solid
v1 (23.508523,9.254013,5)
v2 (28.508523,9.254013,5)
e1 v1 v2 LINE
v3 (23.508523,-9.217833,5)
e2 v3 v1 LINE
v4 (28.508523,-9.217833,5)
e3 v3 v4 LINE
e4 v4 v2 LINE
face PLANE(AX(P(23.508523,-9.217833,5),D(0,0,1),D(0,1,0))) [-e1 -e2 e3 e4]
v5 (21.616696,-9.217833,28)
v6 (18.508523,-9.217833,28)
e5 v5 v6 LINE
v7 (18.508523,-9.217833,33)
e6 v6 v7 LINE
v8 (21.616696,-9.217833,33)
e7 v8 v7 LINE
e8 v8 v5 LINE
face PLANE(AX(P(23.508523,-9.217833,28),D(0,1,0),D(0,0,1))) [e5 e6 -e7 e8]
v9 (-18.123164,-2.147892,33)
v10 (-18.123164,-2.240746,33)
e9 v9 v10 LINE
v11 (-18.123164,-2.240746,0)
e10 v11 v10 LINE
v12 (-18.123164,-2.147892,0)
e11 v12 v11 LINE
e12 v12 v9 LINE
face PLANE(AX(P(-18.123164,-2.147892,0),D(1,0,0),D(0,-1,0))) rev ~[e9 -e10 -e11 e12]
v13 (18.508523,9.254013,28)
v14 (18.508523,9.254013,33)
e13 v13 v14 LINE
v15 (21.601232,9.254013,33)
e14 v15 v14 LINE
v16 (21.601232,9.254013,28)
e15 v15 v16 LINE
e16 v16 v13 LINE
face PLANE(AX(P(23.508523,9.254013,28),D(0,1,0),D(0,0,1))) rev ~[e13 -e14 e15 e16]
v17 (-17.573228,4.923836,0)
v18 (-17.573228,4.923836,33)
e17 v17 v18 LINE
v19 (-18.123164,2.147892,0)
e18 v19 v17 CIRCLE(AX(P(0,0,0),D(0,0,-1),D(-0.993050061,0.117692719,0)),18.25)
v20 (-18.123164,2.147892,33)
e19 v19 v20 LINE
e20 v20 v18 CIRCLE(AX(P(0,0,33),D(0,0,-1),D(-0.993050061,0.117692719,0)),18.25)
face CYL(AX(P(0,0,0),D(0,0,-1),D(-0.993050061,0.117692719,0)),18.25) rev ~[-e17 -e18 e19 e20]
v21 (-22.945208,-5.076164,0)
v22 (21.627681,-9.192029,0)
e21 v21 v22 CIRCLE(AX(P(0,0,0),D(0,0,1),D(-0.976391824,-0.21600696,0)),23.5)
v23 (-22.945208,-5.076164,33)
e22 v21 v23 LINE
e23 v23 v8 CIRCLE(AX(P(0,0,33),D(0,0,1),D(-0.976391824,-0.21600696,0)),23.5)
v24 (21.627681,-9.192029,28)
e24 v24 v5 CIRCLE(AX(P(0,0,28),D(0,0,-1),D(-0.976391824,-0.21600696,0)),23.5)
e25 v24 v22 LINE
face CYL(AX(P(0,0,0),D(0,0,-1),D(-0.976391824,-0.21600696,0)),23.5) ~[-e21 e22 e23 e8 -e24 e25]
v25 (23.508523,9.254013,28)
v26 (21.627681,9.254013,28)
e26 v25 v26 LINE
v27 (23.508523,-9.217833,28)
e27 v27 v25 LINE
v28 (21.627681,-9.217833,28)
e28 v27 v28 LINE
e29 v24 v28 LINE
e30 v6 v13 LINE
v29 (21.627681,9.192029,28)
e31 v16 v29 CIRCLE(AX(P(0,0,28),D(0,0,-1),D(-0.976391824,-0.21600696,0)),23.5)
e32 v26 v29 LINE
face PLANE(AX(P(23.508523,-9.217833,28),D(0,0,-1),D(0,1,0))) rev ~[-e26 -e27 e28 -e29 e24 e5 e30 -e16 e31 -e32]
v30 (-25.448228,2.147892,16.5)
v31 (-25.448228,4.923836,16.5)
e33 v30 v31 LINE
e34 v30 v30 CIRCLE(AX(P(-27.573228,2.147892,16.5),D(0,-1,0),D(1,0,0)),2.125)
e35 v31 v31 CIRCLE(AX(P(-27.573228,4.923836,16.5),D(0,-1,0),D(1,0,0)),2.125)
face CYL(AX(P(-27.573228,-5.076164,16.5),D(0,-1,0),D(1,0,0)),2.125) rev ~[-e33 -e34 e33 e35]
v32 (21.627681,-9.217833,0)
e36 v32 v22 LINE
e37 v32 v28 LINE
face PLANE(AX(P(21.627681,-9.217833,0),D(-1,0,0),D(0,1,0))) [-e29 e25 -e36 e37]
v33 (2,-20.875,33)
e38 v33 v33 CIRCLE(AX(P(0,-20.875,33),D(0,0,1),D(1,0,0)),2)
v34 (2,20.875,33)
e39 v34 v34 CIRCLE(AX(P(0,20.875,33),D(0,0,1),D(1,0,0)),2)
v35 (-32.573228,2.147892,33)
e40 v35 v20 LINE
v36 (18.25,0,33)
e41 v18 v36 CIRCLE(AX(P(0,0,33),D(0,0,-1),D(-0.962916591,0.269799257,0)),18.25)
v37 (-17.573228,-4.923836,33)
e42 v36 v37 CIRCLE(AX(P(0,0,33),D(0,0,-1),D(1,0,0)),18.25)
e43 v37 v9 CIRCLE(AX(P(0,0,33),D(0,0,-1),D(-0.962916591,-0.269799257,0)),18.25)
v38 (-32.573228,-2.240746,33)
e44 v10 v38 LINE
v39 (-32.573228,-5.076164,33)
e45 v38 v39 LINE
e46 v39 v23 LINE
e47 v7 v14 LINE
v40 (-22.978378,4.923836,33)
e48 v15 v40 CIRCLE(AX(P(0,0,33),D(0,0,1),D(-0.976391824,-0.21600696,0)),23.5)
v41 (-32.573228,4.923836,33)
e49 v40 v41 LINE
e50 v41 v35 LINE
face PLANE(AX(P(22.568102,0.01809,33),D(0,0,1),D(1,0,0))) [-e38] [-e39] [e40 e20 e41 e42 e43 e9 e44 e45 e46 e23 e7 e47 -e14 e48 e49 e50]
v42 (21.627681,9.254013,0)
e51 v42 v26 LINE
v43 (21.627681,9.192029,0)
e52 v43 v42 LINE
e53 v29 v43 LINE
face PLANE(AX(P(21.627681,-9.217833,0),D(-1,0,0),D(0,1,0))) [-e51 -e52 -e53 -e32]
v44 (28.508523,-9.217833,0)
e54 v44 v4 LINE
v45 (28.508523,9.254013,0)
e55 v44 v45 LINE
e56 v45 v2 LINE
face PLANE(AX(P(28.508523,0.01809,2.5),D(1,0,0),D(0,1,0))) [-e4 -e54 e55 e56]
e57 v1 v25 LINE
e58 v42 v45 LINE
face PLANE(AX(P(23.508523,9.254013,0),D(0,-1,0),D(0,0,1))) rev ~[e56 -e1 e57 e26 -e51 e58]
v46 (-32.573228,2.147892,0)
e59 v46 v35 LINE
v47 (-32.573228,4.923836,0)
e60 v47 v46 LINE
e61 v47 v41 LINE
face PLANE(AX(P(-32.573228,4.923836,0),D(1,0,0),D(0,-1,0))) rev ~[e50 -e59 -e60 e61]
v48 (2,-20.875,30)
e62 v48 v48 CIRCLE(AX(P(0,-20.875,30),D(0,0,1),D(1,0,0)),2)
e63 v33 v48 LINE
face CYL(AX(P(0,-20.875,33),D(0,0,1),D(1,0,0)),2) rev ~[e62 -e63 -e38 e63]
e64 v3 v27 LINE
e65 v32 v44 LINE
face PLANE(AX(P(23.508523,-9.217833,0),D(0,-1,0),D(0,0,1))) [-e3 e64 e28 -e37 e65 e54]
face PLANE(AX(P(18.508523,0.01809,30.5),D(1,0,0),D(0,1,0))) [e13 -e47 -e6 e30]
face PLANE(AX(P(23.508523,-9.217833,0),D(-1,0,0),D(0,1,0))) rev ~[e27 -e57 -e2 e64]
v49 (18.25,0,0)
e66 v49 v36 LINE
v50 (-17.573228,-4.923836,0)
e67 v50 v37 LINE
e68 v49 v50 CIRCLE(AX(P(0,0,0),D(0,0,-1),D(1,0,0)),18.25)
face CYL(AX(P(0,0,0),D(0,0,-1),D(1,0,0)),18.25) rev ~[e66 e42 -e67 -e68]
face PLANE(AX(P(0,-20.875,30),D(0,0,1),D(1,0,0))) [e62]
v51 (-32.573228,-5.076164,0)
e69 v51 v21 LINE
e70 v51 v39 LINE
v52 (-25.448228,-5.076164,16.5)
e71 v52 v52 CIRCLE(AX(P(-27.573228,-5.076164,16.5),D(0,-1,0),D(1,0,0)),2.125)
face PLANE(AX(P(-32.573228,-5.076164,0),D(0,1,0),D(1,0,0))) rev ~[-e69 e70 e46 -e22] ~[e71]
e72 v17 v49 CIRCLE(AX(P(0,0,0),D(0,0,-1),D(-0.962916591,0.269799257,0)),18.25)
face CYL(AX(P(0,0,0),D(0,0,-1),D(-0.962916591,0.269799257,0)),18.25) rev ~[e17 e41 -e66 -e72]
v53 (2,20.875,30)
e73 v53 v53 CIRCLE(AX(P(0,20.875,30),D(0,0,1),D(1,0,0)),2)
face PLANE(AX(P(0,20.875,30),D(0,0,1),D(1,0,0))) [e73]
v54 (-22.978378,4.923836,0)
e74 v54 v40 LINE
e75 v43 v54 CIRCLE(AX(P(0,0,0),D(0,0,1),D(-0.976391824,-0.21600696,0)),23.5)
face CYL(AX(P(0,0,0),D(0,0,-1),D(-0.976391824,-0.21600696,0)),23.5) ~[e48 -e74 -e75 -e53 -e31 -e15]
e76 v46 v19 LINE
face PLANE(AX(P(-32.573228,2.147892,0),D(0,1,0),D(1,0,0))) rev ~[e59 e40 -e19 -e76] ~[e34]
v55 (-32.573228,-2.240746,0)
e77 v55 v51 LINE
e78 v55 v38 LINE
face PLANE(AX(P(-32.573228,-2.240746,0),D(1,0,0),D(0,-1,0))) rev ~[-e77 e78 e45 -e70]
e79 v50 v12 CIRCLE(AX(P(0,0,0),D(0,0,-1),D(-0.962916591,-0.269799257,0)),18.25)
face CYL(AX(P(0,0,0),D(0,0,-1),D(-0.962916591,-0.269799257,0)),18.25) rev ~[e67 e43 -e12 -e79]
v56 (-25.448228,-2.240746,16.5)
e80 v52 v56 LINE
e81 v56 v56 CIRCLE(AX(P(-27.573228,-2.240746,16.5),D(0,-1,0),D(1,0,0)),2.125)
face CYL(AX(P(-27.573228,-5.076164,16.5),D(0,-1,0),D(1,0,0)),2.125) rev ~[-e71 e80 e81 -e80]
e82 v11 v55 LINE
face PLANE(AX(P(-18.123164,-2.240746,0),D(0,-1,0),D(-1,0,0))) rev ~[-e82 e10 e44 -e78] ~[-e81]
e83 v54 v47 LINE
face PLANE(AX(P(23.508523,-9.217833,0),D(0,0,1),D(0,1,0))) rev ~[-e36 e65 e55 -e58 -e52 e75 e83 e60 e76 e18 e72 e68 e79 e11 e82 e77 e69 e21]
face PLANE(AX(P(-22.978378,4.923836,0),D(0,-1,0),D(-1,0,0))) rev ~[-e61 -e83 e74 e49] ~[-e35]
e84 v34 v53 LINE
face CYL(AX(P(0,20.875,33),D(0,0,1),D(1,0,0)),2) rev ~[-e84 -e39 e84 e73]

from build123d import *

# Parameters (mm, degrees)
F1_DEPTH  = 33
F3_W      = 1.8808413297
F3_H      = 18.471846357
F4_DEPTH  = 33
F5_R      = 2
F6_DEPTH  = 3
F7_W      = 18.471846357
F7_H      = 5
F8_DEPTH  = 5
F9_DEPTH  = 5
F2_R      = 2.125
F10_DEPTH = 25


# Not quite as in the source:
# - a feature names something its author has since deleted; it is built from what else it names


with BuildPart() as f1:
    # F0 (on Top) → F1 (new body)
    with BuildSketch(Plane.XY):
        with BuildLine():
            ThreePointArc((-23.401635828, 2.1478921234), (-23.2315061267, 3.5421918479), (-22.9783775489, 4.9238364331))
            Line((-22.9783775489, 4.9238364331), (-32.5732277849, 4.9238364331))
            Line((-32.5732277849, 4.9238364331), (-32.5732277849, 2.1478921234))
            Line((-32.5732277849, 2.1478921234), (-23.401635828, 2.1478921234))
        make_face()
        with BuildLine():
            Line((-32.5732277849, -5.0761635669), (-22.9452078535, -5.0761635669))
            ThreePointArc((-22.9452078535, -5.0761635669), (-23.2124017724, -3.6652972535), (-23.3929275249, -2.2407458164))
            Line((-23.3929275249, -2.2407458164), (-32.5732277849, -2.2407458164))
            Line((-32.5732277849, -2.2407458164), (-32.5732277849, -5.0761635669))
        make_face()
        with BuildLine():
            ThreePointArc((-22.9452078535, -5.0761635669), (2.55319559, -23.3608902287), (23.5, 0))
            ThreePointArc((23.5, 0), (2.4756946097, 23.3692305436), (-22.9783775489, 4.9238364331))
            Line((-22.9783775489, 4.9238364331), (-17.5732277849, 4.9238364331))
            ThreePointArc((-17.5732277849, 4.9238364331), (2.4850646798, 18.080015308), (18.25, 0))
            ThreePointArc((18.25, 0), (2.4850646798, -18.080015308), (-17.5732277849, -4.9238364331))
            Line((-17.5732277849, -4.9238364331), (-17.5732277849, -5.0761635669))
            Line((-17.5732277849, -5.0761635669), (-22.9452078535, -5.0761635669))
        make_face()
        with BuildLine():
            Line((-17.5732277849, 4.9238364331), (-22.9783775489, 4.9238364331))
            ThreePointArc((-22.9783775489, 4.9238364331), (-23.2315061267, 3.5421918479), (-23.401635828, 2.1478921234))
            Line((-23.401635828, 2.1478921234), (-18.1231636153, 2.1478921234))
            ThreePointArc((-18.1231636153, 2.1478921234), (-17.9020824613, 3.5465396584), (-17.5732277849, 4.9238364331))
        make_face()
        with BuildLine():
            ThreePointArc((-23.3929275249, -2.2407458164), (-23.2124017724, -3.6652972535), (-22.9452078535, -5.0761635669))
            Line((-22.9452078535, -5.0761635669), (-17.5732277849, -5.0761635669))
            Line((-17.5732277849, -5.0761635669), (-17.5732277849, -4.9238364331))
            ThreePointArc((-17.5732277849, -4.9238364331), (-17.9020824613, -3.5465396584), (-18.1231636153, -2.1478921234))
            Line((-18.1231636153, -2.1478921234), (-18.1231636153, -2.2407458164))
            Line((-18.1231636153, -2.2407458164), (-23.3929275249, -2.2407458164))
        make_face()
    extrude(amount=F1_DEPTH)

    # F3 (on Top) → F4 (join)
    with BuildSketch(Plane.XY):
        with Locations((22.5681019947, 0.0180900097)):
            Rectangle(F3_W, F3_H)
    extrude(amount=F4_DEPTH)

    # F5 (on face) → F6 (cut)
    with BuildSketch(Plane.XY.offset(33)):
        with Locations((0, 20.875)):
            Circle(F5_R)
        with Locations((0, -20.875)):
            Circle(F5_R)
    extrude(amount=-F6_DEPTH, mode=Mode.SUBTRACT)

    # F7 (on face) → F8 (cut)
    with BuildSketch(Plane.YZ.offset(23.5085226595)):
        with Locations((0.0180900097, 30.5)):
            Rectangle(F7_W, F7_H)
    extrude(amount=-F8_DEPTH, mode=Mode.SUBTRACT)

    # F7 (on face) → F9 (join)
    with BuildSketch(Plane.YZ.offset(23.5085226595)):
        with Locations((0.0180900097, 2.5)):
            Rectangle(F7_W, F7_H)
    extrude(amount=F9_DEPTH)

    # F2 (on face) → F10 (cut)
    with BuildSketch(Plane.XZ.offset(5.0761635669)):
        with Locations((-27.5732277849, 16.5)):
            Circle(F2_R)
    extrude(amount=-F10_DEPTH, mode=Mode.SUBTRACT)


solid = f1.part
